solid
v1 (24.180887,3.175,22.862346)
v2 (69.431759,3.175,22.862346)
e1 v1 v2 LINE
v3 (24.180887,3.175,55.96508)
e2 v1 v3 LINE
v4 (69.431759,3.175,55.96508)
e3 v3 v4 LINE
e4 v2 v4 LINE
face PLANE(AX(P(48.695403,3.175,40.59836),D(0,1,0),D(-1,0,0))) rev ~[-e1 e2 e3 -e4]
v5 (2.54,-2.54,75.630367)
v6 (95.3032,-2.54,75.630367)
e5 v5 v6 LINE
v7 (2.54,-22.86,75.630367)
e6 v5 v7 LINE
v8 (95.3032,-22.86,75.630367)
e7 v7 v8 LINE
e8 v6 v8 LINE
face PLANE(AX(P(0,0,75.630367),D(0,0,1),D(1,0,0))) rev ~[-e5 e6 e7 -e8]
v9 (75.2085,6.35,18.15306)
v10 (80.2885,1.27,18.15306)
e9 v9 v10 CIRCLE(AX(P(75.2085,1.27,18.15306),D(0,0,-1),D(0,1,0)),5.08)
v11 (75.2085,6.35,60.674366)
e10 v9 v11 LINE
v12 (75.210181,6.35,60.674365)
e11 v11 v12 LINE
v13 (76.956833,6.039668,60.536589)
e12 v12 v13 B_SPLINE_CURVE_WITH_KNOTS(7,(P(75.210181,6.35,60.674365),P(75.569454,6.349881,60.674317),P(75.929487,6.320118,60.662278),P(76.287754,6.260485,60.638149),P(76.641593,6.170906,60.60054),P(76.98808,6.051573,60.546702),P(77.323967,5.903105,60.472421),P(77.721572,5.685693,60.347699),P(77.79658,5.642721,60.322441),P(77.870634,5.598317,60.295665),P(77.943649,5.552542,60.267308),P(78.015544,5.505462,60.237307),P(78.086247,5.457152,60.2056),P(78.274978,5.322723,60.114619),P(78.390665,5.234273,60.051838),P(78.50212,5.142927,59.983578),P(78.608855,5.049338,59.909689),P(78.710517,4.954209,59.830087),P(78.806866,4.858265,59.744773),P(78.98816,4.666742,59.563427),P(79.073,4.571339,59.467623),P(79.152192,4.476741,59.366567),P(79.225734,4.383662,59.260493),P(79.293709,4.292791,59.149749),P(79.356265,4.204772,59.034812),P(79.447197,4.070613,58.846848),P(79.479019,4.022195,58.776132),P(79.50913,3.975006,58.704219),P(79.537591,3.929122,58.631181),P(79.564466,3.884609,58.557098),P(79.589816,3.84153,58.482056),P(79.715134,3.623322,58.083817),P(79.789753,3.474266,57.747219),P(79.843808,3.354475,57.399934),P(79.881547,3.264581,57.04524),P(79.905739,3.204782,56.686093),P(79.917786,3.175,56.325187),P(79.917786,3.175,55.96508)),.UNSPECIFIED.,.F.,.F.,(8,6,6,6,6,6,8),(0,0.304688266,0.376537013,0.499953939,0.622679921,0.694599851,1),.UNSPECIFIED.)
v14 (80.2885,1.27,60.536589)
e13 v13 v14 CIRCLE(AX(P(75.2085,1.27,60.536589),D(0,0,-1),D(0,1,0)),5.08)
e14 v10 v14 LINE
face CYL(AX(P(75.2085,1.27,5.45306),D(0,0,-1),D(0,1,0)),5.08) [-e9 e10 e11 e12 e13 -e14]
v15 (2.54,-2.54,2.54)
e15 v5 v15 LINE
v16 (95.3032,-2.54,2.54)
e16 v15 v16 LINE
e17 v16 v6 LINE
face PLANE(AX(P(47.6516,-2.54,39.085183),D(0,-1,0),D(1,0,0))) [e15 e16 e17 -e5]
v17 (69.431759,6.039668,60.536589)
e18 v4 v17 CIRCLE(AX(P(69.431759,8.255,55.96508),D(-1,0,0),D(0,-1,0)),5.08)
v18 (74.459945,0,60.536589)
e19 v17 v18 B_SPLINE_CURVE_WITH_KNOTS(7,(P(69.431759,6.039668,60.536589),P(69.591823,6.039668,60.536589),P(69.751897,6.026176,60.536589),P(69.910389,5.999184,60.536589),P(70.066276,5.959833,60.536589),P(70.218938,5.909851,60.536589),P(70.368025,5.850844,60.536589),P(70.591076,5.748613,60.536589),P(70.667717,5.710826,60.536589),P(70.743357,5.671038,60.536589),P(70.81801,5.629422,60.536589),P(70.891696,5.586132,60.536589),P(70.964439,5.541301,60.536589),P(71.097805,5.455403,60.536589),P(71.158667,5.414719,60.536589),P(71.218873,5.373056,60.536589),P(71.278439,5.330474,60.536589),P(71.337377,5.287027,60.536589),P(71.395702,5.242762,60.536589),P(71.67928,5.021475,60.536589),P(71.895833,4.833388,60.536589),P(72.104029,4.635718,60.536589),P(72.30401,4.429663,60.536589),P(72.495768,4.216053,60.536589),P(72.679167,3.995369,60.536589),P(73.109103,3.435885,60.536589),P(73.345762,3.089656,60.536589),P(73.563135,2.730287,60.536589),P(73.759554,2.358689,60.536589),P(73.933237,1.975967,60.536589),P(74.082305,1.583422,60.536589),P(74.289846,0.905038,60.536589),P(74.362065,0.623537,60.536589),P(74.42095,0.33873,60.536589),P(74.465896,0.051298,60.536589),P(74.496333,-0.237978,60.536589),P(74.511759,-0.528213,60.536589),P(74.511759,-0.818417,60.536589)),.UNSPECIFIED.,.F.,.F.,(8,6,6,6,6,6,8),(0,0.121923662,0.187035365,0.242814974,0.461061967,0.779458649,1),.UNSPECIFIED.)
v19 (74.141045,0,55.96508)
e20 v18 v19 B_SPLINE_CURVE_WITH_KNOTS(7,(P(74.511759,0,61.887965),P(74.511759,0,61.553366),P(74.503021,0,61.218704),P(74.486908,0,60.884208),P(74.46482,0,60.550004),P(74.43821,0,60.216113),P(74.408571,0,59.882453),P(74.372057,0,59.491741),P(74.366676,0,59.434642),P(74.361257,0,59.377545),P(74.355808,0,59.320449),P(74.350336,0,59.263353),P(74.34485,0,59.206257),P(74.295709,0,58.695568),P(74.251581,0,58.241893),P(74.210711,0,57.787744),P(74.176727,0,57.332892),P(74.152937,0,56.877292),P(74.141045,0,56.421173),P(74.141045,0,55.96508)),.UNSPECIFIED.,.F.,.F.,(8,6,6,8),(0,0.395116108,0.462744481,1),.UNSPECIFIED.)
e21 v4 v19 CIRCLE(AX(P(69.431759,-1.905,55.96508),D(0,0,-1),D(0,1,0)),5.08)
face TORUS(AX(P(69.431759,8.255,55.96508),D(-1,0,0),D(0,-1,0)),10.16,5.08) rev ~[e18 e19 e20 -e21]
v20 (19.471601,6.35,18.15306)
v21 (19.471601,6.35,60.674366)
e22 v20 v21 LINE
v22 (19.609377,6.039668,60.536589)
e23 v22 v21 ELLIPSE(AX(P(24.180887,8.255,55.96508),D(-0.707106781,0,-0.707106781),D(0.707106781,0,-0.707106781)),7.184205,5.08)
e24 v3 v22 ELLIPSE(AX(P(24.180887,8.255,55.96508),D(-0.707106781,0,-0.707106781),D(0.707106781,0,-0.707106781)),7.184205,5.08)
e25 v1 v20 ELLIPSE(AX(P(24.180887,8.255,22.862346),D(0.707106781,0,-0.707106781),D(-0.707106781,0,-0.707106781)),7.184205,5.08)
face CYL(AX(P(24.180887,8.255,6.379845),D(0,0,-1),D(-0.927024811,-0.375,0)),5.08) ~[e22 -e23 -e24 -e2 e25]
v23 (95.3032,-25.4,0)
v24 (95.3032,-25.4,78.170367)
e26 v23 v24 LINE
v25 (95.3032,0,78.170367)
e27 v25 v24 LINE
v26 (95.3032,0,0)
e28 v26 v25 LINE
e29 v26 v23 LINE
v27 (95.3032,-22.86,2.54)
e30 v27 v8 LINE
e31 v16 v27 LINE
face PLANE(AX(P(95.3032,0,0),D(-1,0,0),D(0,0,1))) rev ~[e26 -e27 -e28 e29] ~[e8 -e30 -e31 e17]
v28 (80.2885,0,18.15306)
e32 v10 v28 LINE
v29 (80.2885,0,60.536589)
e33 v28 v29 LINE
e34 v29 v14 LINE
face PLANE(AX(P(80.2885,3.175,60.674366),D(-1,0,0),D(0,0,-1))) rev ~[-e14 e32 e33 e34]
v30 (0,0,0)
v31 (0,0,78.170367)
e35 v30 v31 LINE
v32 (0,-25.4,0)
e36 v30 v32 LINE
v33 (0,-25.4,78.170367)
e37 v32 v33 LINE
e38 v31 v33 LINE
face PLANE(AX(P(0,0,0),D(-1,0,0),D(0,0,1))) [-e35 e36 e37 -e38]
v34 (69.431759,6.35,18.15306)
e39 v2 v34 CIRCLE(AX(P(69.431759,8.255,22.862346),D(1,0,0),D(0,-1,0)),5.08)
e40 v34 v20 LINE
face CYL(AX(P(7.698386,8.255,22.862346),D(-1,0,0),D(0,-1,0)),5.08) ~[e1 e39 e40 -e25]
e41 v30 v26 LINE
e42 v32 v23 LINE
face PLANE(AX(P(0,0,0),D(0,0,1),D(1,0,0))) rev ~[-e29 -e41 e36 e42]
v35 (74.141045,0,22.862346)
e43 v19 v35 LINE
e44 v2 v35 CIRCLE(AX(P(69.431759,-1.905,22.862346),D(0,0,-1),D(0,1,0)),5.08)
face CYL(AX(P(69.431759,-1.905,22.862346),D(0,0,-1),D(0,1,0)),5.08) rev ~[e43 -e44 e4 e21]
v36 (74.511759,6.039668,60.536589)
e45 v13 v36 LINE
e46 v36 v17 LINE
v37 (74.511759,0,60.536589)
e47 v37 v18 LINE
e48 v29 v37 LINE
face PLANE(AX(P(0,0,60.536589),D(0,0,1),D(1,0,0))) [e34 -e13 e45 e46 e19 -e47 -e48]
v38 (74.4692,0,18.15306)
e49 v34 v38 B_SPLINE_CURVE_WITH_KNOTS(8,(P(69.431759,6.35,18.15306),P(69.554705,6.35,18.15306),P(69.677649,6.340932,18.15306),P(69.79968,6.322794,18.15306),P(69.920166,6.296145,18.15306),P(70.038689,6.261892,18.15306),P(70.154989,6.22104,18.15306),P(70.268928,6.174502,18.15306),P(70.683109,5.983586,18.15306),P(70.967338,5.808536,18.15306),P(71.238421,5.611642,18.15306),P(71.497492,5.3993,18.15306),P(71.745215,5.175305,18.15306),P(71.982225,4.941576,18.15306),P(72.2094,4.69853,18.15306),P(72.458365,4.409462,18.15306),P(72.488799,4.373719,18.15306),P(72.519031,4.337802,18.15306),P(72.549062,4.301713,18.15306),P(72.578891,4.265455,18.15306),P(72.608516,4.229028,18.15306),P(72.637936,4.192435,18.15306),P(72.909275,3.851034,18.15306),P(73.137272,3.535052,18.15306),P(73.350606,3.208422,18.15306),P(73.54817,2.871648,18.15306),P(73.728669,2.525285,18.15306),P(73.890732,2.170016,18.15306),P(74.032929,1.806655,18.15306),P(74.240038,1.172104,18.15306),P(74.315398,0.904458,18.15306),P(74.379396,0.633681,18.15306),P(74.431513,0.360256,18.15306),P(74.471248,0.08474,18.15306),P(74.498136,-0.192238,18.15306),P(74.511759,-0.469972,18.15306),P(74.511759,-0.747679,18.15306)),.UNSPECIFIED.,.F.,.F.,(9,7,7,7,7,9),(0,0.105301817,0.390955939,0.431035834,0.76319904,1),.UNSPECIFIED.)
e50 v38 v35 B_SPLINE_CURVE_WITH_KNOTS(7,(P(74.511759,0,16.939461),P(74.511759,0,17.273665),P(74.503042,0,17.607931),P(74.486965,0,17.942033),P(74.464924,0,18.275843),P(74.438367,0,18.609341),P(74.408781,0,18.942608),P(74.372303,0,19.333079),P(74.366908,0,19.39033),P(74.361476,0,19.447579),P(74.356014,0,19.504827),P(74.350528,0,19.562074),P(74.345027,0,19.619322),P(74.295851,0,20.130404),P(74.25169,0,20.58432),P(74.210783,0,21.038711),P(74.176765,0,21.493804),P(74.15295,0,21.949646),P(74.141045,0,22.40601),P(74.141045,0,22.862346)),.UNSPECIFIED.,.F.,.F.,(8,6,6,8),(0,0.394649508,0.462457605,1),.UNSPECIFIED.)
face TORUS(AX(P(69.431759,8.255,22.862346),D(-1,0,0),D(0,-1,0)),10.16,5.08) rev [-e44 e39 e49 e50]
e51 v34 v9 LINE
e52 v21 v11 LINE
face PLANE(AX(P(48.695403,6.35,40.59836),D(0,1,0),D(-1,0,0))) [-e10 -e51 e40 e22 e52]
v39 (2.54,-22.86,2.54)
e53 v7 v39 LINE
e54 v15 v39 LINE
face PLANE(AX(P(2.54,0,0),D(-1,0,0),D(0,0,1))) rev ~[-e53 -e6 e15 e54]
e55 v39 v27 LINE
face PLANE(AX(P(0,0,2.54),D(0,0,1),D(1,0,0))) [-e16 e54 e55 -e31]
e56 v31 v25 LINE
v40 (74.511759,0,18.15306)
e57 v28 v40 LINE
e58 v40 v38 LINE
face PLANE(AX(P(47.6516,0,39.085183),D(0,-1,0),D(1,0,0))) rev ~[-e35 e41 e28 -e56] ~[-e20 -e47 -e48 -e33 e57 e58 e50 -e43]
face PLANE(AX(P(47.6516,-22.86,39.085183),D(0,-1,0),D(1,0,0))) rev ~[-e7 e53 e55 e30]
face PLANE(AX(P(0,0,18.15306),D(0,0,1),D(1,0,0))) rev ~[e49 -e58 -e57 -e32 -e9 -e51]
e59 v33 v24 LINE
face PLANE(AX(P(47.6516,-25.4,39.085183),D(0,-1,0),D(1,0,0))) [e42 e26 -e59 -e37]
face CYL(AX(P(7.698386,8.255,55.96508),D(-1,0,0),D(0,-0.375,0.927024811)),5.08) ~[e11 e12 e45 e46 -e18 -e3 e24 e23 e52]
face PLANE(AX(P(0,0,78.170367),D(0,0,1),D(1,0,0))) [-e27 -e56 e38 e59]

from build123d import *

# Parameters (mm, degrees)
F0_W         = 95.3032001853
F0_H         = 78.1703665853
F1_DEPTH     = 25.4
F2_T         = -2.54
F3_W         = 5.7767406106
F3_H         = 42.3835292459
F4_DEPTH     = 3.175
F5_W         = 5.7767406106
F5_H         = 42.3835292459
F6_DEPTH     = 3.175
F7_T1_DEPTH  = 66.0677355788
F7_T3_DEPTH  = 66.8133734297
F7_T8_DEPTH  = 84.3633291385
F7_T13_DEPTH = 84.3633291385
F8_T1_DEPTH  = 33.1027333037
F8_T6_ANGLE  = 211.2479562886
F8_T12_ANGLE = 207.4140629141
F8_T15_DEPTH = 67.9213053823


# Not quite as in the source:
# - a fillet or chamfer that OpenCascade refuses, or shapes differently, is made with other operations: its cross-section is extruded or revolved along the edge and cut away or added


with BuildPart() as f1:
    # F0 (on Front) → F1 (new body)
    with BuildSketch(Plane.XZ):
        with Locations((47.6516000926, 39.0851832926)):
            Rectangle(F0_W, F0_H)
    extrude(amount=F1_DEPTH)

    # F2
    f2_openings = [f1.faces().sort_by_distance(p)[0] for p in [
        (95.3032, -12.7, 39.085183),
    ]]
    offset(amount=F2_T, openings=f2_openings)

    # F3 (on face) → F4 (join)
    with BuildSketch(Plane(origin=(0, 0, 0), x_dir=(-1, 0, 0), z_dir=(0, 1, 0))):
        with Locations((-77.4001292884, 39.3448248506)):
            Rectangle(F3_W, F3_H)
    extrude(amount=F4_DEPTH)

    # F5 (on face) → F6 (join)
    with BuildSketch(Plane(origin=(0, 3.175, 0), x_dir=(-1, 0, 0), z_dir=(0, 1, 0))):
        Polygon((-74.5117589831, 60.5365894735), (-74.5117589831, 18.1530602276), (-19.4716006517, 18.1530602276), (-19.4716006517, 60.6743656099), (-80.2884995937, 60.6743656099), (-80.2884995937, 60.5365894735), align=None)
        with Locations((-77.4001292884, 39.3448248506)):
            Rectangle(F5_W, F5_H)
    extrude(amount=F6_DEPTH)

    # F7: fillet of radius 5.08 on 3 edges, made by hand

    # F7_s2 → F7_t1 (cut)
    with BuildSketch(Plane.XY.offset(6.3798451294)):
        with BuildLine():
            ThreePointArc((19.4716006517, 6.35), (21.3410803596, 4.0428865162), (24.180886691, 3.175))
            Line((24.180886691, 3.175), (19.4716006517, 3.175))
            Line((19.4716006517, 3.175), (19.4716006517, 6.35))
        make_face()
    extrude(amount=F7_T1_DEPTH, mode=Mode.SUBTRACT)

    # F7_s4 → F7_t3 (cut)
    with BuildSketch(Plane.YZ.offset(7.6983855535)):
        with BuildLine():
            ThreePointArc((3.175, 22.8623462669), (4.0428865162, 20.0225399355), (6.35, 18.1530602276))
            Line((6.35, 18.1530602276), (3.175, 18.1530602276))
            Line((3.175, 18.1530602276), (3.175, 22.8623462669))
        make_face()
    extrude(amount=F7_T3_DEPTH, mode=Mode.SUBTRACT)


with BuildPart() as f7_tool6:
    # F7_s7 → F7_t8 (new body)
    with BuildSketch(Plane.YZ.offset(7.6983855535)):
        with BuildLine():
            ThreePointArc((6.35, 60.6743656099), (4.0428865162, 58.804885902), (3.175, 55.9650795706))
            Line((3.175, 55.9650795706), (3.175, 60.6743656099))
            Line((3.175, 60.6743656099), (6.35, 60.6743656099))
        make_face()
    extrude(amount=F7_T8_DEPTH)

    split(bisect_by=Plane.XY.offset(60.5365894735), keep=Keep.TOP)


with BuildPart() as f1_1:
    add(f1.part)

    # F7_t5: cut F7_tool6
    add(f7_tool6.part, mode=Mode.SUBTRACT)


with BuildPart() as f7_tool11:
    # F7_s12 → F7_t13 (new body)
    with BuildSketch(Plane.YZ.offset(7.6983855535)):
        with BuildLine():
            ThreePointArc((6.35, 60.6743656099), (4.0428865162, 58.804885902), (3.175, 55.9650795706))
            Line((3.175, 55.9650795706), (3.175, 60.6743656099))
            Line((3.175, 60.6743656099), (6.35, 60.6743656099))
        make_face()
    extrude(amount=F7_T13_DEPTH)

    split(bisect_by=Plane.YZ.offset(74.5117589831), keep=Keep.BOTTOM)


with BuildPart() as f1_2:
    add(f1_1.part)

    # F7_t10: cut F7_tool11
    add(f7_tool11.part, mode=Mode.SUBTRACT)

    # F8: fillet of radius 5.08 on 2 edges, made by hand

    # F8_s2 → F8_t1 (join)
    with BuildSketch(Plane.XY.offset(22.8623462669)):
        with BuildLine():
            ThreePointArc((69.4317589831, 3.175), (73.0238614316, 1.6871024484), (74.5117589831, -1.905))
            Line((74.5117589831, -1.905), (74.5117589831, 3.175))
            Line((74.5117589831, 3.175), (69.4317589831, 3.175))
        make_face()
    extrude(amount=F8_T1_DEPTH)


with BuildPart() as f8_tool4:
    # F8_s5 → F8_t6 (revolve)
    with BuildSketch(Plane.XY.offset(22.8623462668)):
        with BuildLine():
            ThreePointArc((69.4317589831, 3.175), (73.0238614316, 1.6871024484), (74.5117589831, -1.905))
            Line((74.5117589831, -1.905), (74.5117589831, 3.175))
            Line((74.5117589831, 3.175), (69.4317589831, 3.175))
        make_face()
    revolve(axis=Axis((74.5117589831, 8.2549999999, 22.8623462668), (1, 0, 0)), revolution_arc=F8_T6_ANGLE)

    split(bisect_by=Plane.XZ.offset(-6.35), keep=Keep.TOP)

    split(bisect_by=Plane.XY.offset(18.1530602276), keep=Keep.TOP)


with BuildPart() as f1_3:
    add(f1_2.part)

    # F8_t3: union F8_tool4
    add(f8_tool4.part)


with BuildPart() as f8_tool10:
    # F8_s11 → F8_t12 (revolve)
    with BuildSketch(Plane.XY.offset(55.9650795707)):
        with BuildLine():
            ThreePointArc((69.4317589831, 3.175), (73.0238614316, 1.6871024484), (74.5117589831, -1.905))
            Line((74.5117589831, -1.905), (74.5117589831, 3.175))
            Line((74.5117589831, 3.175), (69.4317589831, 3.175))
        make_face()
    revolve(axis=Axis((74.5117589831, 8.2549999999, 55.9650795707), (-1, 0, 0)), revolution_arc=F8_T12_ANGLE)

    split(bisect_by=Plane.XZ.offset(-6.35), keep=Keep.TOP)

    split(bisect_by=Plane.XY.offset(60.5365894735), keep=Keep.BOTTOM)


with BuildPart() as f1_4:
    add(f1_3.part)

    # F8_t9: union F8_tool10
    add(f8_tool10.part)

    # F8_s16 → F8_t15 (cut)
    with BuildSketch(Plane.XY.offset(5.4530602276)):
        with BuildLine():
            ThreePointArc((75.2084995937, 6.35), (78.8006020422, 4.8621024484), (80.2884995937, 1.27))
            Line((80.2884995937, 1.27), (80.2884995937, 6.35))
            Line((80.2884995937, 6.35), (75.2084995937, 6.35))
        make_face()
    extrude(amount=F8_T15_DEPTH, mode=Mode.SUBTRACT)


solid = f1_4.part
